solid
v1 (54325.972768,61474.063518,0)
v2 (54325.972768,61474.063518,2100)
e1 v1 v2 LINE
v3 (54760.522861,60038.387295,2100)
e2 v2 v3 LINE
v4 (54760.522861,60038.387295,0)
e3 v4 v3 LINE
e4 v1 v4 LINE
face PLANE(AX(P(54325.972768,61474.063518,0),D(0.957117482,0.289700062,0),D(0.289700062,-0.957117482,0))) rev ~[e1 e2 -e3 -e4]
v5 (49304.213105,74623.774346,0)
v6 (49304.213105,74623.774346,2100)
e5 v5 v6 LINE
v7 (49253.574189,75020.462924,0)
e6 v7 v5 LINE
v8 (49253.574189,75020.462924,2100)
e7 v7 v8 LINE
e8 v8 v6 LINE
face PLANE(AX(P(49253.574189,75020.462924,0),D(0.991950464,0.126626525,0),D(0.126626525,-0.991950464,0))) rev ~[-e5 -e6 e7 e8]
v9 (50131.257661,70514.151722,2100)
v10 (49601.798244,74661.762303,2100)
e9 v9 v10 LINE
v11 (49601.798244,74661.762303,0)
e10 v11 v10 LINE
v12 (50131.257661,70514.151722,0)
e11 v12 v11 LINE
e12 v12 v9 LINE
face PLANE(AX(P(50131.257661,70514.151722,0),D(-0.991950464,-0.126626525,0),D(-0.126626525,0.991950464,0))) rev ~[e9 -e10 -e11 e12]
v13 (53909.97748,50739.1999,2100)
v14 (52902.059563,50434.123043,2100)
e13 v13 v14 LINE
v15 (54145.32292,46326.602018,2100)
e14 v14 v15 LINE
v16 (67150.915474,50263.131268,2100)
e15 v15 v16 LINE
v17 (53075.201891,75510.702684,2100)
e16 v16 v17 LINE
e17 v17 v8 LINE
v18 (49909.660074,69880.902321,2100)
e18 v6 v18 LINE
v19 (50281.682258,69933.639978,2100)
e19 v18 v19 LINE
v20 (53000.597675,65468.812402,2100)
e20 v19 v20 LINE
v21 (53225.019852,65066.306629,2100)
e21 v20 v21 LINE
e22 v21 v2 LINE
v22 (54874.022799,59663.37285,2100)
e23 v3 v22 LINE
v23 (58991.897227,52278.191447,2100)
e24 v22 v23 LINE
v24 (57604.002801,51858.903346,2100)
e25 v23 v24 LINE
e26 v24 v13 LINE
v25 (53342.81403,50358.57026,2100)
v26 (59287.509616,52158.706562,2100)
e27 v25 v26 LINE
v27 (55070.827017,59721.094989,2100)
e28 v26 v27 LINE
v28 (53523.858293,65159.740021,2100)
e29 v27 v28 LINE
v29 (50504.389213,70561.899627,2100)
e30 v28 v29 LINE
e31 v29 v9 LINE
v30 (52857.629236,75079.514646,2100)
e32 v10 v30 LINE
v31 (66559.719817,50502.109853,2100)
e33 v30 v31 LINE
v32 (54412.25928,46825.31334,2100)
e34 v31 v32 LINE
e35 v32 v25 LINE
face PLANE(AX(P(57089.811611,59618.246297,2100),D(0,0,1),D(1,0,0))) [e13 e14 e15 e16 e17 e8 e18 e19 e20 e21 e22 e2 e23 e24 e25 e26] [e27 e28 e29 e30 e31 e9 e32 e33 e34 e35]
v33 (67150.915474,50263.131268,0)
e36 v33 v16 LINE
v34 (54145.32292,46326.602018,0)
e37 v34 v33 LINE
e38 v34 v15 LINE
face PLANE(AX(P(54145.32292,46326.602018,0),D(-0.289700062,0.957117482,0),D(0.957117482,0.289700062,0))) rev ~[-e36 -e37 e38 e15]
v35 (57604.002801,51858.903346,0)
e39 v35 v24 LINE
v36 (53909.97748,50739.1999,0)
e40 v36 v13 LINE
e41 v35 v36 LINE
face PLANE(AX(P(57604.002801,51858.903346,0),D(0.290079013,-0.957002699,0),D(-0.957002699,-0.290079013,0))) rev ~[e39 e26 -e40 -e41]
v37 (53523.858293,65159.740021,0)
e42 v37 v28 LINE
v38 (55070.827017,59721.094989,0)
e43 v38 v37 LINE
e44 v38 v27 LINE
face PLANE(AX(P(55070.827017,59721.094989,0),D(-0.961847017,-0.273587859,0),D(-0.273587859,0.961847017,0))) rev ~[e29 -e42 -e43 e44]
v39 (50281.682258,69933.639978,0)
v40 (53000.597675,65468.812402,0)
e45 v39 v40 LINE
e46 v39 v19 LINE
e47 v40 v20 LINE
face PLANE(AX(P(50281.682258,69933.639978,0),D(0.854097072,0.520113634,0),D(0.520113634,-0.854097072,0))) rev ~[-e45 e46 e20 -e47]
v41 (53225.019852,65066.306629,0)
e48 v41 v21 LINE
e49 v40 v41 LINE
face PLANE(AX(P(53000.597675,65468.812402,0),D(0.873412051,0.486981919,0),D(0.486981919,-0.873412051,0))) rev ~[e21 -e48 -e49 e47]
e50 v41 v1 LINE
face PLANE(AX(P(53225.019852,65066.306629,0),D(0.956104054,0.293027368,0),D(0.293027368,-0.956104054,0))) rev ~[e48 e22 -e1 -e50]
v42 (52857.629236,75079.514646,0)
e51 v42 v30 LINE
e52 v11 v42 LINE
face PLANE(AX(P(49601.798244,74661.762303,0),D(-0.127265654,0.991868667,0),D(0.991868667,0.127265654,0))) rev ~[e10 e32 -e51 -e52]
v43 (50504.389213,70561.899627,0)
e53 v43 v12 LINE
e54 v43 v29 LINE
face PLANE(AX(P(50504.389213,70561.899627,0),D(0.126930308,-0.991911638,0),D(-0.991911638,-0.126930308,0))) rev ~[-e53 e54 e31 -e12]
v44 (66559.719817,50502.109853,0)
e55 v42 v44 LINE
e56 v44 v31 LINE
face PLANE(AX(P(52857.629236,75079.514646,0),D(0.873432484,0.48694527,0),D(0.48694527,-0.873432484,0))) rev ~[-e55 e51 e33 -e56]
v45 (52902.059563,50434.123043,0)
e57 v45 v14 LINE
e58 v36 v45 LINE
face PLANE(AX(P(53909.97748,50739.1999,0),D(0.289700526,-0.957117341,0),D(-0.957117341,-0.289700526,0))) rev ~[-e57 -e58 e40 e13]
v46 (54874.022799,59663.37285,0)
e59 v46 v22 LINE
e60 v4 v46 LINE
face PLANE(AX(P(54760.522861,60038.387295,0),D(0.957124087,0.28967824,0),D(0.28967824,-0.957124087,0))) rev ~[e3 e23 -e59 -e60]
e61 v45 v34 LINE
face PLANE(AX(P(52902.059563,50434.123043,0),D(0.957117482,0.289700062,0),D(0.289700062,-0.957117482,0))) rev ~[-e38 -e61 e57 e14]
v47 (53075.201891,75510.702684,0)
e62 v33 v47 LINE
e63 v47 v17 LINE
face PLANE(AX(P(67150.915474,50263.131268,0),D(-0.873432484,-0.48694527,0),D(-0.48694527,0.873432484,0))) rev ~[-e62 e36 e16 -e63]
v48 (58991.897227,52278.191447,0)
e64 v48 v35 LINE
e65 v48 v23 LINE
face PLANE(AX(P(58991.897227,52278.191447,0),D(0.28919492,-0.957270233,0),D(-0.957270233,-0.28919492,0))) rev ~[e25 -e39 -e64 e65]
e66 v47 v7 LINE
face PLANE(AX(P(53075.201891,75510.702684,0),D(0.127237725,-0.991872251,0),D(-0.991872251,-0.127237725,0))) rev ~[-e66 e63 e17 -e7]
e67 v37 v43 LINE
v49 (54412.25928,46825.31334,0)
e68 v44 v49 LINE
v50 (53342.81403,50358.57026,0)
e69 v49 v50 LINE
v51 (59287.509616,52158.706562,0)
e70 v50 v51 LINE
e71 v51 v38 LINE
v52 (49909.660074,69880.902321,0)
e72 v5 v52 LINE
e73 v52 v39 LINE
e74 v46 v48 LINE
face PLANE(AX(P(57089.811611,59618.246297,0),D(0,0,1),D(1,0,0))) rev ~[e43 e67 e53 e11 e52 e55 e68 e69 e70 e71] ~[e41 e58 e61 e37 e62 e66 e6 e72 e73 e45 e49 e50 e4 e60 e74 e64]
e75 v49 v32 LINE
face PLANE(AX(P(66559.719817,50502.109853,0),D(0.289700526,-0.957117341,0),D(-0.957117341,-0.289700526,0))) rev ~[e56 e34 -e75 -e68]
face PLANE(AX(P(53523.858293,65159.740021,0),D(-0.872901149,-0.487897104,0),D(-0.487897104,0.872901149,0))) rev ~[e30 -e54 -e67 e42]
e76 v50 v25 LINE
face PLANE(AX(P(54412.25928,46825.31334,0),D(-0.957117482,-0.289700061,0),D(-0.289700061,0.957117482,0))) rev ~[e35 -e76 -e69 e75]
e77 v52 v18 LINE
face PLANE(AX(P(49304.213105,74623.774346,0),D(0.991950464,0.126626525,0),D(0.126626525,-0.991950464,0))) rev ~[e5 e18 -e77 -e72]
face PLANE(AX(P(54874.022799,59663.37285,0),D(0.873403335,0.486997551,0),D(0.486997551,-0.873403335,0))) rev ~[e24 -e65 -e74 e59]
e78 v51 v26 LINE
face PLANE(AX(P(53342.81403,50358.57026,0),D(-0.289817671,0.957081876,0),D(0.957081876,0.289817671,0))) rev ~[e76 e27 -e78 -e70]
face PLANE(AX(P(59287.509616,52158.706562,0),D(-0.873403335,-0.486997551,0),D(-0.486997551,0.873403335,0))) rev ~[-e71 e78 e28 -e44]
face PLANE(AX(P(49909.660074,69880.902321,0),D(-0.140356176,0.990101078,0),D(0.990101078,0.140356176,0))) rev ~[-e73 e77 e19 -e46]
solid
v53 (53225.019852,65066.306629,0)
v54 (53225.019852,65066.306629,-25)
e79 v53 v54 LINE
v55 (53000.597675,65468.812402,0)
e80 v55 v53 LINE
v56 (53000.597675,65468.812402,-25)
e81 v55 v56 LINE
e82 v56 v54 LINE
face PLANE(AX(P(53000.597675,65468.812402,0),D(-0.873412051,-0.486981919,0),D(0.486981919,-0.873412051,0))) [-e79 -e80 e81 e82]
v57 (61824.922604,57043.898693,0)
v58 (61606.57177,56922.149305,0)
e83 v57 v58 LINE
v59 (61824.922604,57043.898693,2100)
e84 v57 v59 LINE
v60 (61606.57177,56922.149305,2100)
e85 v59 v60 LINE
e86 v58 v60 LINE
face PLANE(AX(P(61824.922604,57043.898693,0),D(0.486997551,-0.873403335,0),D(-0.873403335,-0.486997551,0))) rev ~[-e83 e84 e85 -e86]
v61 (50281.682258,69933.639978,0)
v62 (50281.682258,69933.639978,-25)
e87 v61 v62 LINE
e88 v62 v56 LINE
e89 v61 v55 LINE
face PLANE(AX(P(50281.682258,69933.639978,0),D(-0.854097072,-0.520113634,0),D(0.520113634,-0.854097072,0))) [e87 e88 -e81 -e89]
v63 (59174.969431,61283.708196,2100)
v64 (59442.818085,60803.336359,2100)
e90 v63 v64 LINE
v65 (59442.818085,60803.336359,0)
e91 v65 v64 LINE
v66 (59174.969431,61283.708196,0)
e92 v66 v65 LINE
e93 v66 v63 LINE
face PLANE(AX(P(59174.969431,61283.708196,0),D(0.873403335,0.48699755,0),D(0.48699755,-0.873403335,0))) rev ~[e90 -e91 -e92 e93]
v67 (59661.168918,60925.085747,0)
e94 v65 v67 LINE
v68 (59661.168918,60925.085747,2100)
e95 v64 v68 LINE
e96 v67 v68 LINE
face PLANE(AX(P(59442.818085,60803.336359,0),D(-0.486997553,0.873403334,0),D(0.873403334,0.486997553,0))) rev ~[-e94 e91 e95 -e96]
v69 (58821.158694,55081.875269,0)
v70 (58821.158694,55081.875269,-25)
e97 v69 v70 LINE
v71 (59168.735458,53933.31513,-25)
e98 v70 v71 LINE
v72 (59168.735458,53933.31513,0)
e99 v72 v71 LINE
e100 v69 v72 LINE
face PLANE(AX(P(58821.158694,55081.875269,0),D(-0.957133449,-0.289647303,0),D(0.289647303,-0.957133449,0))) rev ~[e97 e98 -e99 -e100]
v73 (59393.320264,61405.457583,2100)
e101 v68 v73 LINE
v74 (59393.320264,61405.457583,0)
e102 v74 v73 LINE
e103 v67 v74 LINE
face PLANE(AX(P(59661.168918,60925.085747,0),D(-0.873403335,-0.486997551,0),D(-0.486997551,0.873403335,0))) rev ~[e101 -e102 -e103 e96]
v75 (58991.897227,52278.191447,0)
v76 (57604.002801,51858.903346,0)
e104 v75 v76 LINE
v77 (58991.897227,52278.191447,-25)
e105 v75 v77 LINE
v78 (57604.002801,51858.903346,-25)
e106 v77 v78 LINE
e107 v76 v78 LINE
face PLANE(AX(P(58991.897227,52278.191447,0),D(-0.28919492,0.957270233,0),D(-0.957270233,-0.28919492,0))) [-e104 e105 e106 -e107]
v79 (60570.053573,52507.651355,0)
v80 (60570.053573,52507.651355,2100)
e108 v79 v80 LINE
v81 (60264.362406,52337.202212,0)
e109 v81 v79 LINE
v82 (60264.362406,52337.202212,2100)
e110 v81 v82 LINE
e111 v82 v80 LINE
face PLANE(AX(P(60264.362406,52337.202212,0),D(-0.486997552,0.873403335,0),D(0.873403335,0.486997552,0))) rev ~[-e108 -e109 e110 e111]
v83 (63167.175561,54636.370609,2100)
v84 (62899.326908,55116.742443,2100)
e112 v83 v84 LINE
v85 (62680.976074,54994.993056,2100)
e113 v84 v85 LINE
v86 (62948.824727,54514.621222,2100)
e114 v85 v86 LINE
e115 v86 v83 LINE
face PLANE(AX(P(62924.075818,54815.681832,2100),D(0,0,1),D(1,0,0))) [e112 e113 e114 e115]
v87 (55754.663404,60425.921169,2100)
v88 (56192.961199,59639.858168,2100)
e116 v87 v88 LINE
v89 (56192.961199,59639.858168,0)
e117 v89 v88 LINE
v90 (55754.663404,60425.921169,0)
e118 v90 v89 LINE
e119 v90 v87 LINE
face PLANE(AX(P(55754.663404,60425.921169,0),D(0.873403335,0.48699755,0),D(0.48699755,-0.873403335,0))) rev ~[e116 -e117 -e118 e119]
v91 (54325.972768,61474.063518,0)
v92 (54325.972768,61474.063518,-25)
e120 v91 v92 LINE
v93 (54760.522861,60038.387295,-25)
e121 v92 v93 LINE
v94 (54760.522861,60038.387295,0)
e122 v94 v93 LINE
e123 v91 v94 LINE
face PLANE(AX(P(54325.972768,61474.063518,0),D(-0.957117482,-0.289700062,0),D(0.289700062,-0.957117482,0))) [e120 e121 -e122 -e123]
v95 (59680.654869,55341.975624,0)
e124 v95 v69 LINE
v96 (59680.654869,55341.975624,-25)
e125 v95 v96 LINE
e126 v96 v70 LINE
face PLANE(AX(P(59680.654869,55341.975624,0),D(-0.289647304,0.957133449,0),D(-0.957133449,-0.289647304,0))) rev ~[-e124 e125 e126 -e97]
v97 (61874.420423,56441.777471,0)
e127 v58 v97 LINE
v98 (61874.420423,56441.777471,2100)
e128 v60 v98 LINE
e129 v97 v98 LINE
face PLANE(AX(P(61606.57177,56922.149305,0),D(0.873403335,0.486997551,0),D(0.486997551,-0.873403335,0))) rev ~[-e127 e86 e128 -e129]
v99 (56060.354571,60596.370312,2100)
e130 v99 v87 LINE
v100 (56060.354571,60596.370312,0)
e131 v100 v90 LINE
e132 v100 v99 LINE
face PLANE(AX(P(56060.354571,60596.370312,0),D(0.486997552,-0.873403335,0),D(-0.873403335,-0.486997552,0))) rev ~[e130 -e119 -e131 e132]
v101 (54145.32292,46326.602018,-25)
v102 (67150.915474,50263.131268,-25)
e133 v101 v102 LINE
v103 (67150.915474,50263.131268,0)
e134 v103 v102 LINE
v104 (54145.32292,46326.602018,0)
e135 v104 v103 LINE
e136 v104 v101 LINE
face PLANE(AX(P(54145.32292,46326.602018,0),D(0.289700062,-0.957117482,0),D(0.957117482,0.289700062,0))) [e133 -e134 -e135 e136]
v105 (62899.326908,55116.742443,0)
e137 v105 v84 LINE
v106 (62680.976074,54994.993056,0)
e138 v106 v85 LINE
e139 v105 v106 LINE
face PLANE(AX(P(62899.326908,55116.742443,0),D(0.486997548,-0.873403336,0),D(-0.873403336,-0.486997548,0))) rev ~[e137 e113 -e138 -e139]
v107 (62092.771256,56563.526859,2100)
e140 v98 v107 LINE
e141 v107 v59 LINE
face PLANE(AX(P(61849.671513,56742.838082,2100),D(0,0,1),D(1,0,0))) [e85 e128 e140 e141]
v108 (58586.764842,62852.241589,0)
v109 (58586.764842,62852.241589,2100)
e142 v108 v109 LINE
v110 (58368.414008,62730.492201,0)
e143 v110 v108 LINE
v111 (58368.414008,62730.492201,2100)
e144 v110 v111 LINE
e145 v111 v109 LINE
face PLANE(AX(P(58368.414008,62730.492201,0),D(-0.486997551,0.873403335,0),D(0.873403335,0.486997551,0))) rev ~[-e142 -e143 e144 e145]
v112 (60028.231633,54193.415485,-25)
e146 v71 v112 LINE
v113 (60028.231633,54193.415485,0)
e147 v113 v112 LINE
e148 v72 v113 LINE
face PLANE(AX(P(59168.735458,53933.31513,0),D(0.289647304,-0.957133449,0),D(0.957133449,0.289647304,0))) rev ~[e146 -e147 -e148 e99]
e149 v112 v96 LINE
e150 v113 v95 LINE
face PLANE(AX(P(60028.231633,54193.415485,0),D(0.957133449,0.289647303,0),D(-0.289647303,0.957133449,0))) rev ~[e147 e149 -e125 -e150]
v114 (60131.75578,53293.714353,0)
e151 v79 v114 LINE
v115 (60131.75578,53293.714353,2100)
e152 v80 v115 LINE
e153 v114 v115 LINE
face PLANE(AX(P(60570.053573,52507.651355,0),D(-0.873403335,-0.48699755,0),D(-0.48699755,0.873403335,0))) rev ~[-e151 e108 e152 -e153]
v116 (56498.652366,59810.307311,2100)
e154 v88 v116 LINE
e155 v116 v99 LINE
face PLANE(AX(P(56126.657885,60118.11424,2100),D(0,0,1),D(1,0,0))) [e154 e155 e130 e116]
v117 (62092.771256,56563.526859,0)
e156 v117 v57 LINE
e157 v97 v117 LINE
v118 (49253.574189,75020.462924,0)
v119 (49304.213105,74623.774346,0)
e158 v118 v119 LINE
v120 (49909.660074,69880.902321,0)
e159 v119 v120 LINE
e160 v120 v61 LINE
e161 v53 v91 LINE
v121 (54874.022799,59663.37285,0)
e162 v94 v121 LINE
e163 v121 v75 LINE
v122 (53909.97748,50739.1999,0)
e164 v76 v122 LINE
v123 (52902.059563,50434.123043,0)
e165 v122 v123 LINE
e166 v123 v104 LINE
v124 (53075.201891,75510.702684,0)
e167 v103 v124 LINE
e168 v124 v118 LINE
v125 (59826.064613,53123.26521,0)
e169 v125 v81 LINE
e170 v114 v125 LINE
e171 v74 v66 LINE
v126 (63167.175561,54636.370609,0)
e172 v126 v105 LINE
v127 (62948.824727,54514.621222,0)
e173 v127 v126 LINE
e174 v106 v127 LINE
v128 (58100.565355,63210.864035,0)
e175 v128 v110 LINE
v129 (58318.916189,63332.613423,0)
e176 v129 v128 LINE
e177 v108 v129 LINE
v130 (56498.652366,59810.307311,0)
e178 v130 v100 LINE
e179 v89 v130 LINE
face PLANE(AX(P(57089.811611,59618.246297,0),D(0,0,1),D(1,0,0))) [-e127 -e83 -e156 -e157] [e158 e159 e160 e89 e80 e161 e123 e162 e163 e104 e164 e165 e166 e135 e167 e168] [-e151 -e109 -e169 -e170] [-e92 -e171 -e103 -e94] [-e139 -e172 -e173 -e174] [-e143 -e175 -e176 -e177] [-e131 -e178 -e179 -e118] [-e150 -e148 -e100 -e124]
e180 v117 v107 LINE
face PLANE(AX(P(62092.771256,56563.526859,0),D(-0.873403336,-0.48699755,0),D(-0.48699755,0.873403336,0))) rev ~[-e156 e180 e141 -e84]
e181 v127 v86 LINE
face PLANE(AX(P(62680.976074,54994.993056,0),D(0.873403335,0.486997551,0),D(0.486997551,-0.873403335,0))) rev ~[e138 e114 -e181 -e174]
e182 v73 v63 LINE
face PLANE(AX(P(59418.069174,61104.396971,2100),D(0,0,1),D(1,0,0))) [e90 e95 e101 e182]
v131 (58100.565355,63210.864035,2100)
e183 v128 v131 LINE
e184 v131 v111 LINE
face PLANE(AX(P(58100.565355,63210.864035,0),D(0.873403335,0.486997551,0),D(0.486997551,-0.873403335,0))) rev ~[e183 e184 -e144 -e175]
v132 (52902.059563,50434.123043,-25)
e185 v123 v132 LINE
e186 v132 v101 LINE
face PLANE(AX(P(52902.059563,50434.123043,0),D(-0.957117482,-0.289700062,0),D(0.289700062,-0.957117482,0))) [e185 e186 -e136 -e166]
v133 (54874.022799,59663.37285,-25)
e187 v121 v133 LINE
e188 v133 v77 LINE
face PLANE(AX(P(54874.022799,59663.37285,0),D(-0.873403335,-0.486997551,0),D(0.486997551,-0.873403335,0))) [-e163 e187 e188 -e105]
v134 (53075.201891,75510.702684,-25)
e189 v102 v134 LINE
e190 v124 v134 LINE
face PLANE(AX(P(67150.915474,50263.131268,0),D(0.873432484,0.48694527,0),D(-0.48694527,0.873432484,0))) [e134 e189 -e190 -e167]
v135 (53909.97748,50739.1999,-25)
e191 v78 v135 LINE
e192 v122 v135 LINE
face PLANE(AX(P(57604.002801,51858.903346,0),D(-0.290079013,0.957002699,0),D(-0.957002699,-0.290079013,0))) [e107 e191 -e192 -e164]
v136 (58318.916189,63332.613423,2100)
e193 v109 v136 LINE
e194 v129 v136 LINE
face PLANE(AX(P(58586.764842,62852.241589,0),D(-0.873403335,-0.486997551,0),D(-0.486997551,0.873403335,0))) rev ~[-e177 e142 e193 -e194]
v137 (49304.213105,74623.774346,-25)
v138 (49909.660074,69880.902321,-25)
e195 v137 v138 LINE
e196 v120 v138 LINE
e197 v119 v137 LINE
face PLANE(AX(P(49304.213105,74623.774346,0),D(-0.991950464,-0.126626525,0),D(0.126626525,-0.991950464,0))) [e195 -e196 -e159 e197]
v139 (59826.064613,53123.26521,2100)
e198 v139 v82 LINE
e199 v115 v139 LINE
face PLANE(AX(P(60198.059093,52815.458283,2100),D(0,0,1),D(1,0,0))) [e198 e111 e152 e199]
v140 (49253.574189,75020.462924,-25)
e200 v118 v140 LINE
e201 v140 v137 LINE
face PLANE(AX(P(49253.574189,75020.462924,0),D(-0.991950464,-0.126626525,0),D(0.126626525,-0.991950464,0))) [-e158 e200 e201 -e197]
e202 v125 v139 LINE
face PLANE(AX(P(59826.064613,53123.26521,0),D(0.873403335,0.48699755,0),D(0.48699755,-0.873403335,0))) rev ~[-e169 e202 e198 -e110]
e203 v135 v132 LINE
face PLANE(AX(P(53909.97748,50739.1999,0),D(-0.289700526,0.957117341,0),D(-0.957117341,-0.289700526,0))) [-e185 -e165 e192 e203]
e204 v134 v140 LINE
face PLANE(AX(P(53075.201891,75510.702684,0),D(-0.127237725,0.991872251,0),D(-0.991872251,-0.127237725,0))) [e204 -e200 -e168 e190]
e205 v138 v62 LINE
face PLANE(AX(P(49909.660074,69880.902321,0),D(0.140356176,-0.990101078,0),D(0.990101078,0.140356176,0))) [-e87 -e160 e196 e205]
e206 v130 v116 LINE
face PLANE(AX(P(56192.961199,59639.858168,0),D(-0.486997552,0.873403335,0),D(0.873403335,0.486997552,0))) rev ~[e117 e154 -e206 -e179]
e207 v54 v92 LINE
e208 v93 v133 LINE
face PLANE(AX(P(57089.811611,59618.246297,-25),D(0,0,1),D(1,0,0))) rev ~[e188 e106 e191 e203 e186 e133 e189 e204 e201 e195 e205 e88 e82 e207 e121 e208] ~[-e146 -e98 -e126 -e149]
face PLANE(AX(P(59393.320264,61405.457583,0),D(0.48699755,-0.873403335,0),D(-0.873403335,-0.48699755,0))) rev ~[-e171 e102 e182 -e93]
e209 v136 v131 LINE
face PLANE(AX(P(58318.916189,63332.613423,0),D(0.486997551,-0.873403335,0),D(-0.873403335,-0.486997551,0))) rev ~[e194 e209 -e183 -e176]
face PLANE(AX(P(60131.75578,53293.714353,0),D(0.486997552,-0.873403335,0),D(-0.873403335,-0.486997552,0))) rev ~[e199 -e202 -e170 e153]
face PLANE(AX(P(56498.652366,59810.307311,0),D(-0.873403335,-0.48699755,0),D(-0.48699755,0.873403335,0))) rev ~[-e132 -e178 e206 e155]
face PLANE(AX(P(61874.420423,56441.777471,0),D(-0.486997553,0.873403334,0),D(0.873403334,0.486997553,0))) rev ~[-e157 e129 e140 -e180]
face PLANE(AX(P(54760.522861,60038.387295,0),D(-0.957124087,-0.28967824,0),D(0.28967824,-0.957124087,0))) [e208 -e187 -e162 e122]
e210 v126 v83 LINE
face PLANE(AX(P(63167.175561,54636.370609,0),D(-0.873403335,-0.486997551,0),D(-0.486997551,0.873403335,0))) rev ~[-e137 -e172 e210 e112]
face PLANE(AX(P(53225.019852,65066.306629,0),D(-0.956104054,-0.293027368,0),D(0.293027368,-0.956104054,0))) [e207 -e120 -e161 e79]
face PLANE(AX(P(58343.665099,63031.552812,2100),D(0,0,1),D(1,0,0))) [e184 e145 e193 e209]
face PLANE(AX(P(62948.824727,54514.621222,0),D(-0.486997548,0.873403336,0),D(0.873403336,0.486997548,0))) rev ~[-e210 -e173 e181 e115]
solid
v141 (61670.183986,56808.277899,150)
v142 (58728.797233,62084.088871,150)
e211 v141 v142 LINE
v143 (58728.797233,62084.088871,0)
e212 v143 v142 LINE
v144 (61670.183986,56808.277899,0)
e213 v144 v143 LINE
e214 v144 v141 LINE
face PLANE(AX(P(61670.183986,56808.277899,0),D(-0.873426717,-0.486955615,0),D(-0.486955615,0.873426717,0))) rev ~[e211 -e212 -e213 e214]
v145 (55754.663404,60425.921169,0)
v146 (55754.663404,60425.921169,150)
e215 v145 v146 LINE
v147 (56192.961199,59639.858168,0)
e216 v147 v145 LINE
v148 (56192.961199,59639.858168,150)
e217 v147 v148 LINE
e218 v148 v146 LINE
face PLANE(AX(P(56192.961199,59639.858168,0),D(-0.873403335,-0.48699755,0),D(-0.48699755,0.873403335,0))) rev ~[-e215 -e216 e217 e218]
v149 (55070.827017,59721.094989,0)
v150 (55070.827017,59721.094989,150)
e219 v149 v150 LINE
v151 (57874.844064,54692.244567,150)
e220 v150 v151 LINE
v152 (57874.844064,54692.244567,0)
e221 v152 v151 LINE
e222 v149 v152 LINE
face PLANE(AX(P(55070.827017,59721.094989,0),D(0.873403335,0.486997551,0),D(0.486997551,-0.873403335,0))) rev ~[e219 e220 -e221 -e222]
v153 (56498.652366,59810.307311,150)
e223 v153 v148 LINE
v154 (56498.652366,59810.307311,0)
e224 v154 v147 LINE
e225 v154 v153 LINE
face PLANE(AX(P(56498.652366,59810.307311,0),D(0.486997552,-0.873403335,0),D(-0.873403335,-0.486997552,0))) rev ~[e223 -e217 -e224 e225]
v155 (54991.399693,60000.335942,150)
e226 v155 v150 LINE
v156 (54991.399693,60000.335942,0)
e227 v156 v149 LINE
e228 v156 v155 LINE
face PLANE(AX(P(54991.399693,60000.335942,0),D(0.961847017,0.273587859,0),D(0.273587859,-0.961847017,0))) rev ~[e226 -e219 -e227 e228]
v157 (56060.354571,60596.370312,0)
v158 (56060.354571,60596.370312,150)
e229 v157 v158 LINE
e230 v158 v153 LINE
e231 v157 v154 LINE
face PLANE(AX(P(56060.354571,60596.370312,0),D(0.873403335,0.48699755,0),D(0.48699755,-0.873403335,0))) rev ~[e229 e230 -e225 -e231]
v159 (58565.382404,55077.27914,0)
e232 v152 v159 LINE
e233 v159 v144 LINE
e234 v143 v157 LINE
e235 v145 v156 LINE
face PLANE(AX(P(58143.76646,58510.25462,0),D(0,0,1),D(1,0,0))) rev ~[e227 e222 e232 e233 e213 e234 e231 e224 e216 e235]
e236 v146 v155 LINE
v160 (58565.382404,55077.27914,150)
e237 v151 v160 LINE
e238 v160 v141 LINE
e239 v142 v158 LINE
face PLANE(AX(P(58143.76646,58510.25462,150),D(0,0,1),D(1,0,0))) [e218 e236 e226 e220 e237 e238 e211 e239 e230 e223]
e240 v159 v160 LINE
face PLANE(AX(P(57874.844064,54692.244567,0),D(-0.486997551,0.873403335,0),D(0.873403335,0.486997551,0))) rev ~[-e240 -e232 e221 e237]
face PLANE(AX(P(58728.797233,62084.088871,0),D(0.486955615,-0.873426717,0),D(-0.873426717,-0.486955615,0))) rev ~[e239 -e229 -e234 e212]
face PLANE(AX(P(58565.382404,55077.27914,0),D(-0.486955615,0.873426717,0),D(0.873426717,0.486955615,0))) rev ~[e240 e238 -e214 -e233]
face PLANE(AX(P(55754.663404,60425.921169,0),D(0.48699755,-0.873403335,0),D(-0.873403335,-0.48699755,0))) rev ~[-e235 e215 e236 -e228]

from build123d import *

# Parameters (mm, degrees)
F3_DEPTH  = 2100
F5_DEPTH  = 25
F7_DEPTH  = 2100
F9_DEPTH  = 150
F11_DEPTH = 25.001


# Not quite as in the source:
# - ends of sketch curves that miss each other by under 0.0002 mm in the source are joined


with BuildPart() as f3:
    # F2 (on Top) → F3 (new body)
    with BuildSketch(Plane.XY):
        Polygon((52902.0595629306, 50434.1230428591), (54145.32292, 46326.602018), (54431.4219269024, 46413.1983883223), (67150.915474, 50263.131268), (53075.201891, 75510.702684), (49253.5741891713, 75020.4629237414), (49304.213105, 74623.774346), (49909.660074, 69880.902321), (50281.682258, 69933.639978), (53000.597675, 65468.812402), (53225.019852, 65066.306629), (54325.972768, 61474.063518), (54760.522861, 60038.387295), (54874.022799, 59663.37285), (58991.897227, 52278.191447), (57604.002801, 51858.903346), (53909.97748, 50739.1999), align=None)
        Polygon((54412.25928, 46825.31334), (53342.81403, 50358.57026), (59287.509616, 52158.706562), (55070.827017, 59721.094989), (53523.858293, 65159.740021), (50504.389213421, 70561.8996273451), (50131.257661, 70514.151722), (49601.798244, 74661.762303), (52857.629236, 75079.514646), (66559.719817, 50502.109853), align=None, mode=Mode.SUBTRACT)
    extrude(amount=F3_DEPTH)


with BuildPart() as f5:
    # F4 (on Top) → F5 (new body)
    with BuildSketch(Plane.XY):
        Polygon((54760.522861, 60038.387295), (54874.022799, 59663.37285), (58991.897227, 52278.191447), (57604.002801, 51858.903346), (53909.97748, 50739.1999), (52902.0595629306, 50434.1230428591), (54145.32292, 46326.602018), (67150.915474, 50263.131268), (53075.201891, 75510.702684), (49253.5741891713, 75020.4629237414), (49304.213105, 74623.774346), (49909.660074, 69880.902321), (50281.682258, 69933.639978), (53000.597675, 65468.812402), (53225.019852, 65066.306629), (54325.972768, 61474.063518), align=None)
    extrude(amount=-F5_DEPTH)

    # F6 (on Top) → F7 (join)
    with BuildSketch(Plane.XY):
        Polygon((63167.175561, 54636.370609), (62899.326908, 55116.742443), (62680.976074, 54994.993056), (62948.824727, 54514.621222), align=None)
        Polygon((61606.57177, 56922.149305), (61874.420423, 56441.777471), (62092.771256, 56563.526859), (61824.922604, 57043.898693), align=None)
        Polygon((60131.75578, 53293.714353), (59826.064613, 53123.26521), (60264.362406, 52337.202212), (60570.053573, 52507.651355), align=None)
        Polygon((56498.652366, 59810.307311), (56060.354571, 60596.370312), (55754.663404, 60425.921169), (56192.961199, 59639.858168), align=None)
        Polygon((59393.320264, 61405.457583), (59174.969431, 61283.708196), (59442.818085, 60803.336359), (59661.168918, 60925.085747), align=None)
        Polygon((58586.764842, 62852.241589), (58318.916189, 63332.613423), (58100.565355, 63210.864035), (58368.414008, 62730.492201), align=None)
    extrude(amount=F7_DEPTH)

    # F10 (on face) → F11 (cut, through all)
    with BuildSketch(Plane.XY):
        Polygon((59168.735458, 53933.31513), (60028.231633, 54193.415485), (59680.654869, 55341.975624), (58821.158694, 55081.875269), align=None)
    extrude(amount=-F11_DEPTH, mode=Mode.SUBTRACT)


with BuildPart() as f9:
    # F8 (on Top) → F9 (new body)
    with BuildSketch(Plane.XY):
        Polygon((58728.797232615, 62084.088870835), (56060.354571, 60596.370312), (56498.652366, 59810.307311), (56192.961199, 59639.858168), (55754.663404, 60425.921169), (54991.3996931603, 60000.3359416475), (55070.827017, 59721.094989), (55102.8168784927, 59663.7229310719), (57874.844064254, 54692.2445670372), (58565.3824039826, 55077.2791403316), (61670.1839855803, 56808.2778988538), align=None)
    extrude(amount=F9_DEPTH)


solid = Compound([f3.part, f5.part, f9.part])
